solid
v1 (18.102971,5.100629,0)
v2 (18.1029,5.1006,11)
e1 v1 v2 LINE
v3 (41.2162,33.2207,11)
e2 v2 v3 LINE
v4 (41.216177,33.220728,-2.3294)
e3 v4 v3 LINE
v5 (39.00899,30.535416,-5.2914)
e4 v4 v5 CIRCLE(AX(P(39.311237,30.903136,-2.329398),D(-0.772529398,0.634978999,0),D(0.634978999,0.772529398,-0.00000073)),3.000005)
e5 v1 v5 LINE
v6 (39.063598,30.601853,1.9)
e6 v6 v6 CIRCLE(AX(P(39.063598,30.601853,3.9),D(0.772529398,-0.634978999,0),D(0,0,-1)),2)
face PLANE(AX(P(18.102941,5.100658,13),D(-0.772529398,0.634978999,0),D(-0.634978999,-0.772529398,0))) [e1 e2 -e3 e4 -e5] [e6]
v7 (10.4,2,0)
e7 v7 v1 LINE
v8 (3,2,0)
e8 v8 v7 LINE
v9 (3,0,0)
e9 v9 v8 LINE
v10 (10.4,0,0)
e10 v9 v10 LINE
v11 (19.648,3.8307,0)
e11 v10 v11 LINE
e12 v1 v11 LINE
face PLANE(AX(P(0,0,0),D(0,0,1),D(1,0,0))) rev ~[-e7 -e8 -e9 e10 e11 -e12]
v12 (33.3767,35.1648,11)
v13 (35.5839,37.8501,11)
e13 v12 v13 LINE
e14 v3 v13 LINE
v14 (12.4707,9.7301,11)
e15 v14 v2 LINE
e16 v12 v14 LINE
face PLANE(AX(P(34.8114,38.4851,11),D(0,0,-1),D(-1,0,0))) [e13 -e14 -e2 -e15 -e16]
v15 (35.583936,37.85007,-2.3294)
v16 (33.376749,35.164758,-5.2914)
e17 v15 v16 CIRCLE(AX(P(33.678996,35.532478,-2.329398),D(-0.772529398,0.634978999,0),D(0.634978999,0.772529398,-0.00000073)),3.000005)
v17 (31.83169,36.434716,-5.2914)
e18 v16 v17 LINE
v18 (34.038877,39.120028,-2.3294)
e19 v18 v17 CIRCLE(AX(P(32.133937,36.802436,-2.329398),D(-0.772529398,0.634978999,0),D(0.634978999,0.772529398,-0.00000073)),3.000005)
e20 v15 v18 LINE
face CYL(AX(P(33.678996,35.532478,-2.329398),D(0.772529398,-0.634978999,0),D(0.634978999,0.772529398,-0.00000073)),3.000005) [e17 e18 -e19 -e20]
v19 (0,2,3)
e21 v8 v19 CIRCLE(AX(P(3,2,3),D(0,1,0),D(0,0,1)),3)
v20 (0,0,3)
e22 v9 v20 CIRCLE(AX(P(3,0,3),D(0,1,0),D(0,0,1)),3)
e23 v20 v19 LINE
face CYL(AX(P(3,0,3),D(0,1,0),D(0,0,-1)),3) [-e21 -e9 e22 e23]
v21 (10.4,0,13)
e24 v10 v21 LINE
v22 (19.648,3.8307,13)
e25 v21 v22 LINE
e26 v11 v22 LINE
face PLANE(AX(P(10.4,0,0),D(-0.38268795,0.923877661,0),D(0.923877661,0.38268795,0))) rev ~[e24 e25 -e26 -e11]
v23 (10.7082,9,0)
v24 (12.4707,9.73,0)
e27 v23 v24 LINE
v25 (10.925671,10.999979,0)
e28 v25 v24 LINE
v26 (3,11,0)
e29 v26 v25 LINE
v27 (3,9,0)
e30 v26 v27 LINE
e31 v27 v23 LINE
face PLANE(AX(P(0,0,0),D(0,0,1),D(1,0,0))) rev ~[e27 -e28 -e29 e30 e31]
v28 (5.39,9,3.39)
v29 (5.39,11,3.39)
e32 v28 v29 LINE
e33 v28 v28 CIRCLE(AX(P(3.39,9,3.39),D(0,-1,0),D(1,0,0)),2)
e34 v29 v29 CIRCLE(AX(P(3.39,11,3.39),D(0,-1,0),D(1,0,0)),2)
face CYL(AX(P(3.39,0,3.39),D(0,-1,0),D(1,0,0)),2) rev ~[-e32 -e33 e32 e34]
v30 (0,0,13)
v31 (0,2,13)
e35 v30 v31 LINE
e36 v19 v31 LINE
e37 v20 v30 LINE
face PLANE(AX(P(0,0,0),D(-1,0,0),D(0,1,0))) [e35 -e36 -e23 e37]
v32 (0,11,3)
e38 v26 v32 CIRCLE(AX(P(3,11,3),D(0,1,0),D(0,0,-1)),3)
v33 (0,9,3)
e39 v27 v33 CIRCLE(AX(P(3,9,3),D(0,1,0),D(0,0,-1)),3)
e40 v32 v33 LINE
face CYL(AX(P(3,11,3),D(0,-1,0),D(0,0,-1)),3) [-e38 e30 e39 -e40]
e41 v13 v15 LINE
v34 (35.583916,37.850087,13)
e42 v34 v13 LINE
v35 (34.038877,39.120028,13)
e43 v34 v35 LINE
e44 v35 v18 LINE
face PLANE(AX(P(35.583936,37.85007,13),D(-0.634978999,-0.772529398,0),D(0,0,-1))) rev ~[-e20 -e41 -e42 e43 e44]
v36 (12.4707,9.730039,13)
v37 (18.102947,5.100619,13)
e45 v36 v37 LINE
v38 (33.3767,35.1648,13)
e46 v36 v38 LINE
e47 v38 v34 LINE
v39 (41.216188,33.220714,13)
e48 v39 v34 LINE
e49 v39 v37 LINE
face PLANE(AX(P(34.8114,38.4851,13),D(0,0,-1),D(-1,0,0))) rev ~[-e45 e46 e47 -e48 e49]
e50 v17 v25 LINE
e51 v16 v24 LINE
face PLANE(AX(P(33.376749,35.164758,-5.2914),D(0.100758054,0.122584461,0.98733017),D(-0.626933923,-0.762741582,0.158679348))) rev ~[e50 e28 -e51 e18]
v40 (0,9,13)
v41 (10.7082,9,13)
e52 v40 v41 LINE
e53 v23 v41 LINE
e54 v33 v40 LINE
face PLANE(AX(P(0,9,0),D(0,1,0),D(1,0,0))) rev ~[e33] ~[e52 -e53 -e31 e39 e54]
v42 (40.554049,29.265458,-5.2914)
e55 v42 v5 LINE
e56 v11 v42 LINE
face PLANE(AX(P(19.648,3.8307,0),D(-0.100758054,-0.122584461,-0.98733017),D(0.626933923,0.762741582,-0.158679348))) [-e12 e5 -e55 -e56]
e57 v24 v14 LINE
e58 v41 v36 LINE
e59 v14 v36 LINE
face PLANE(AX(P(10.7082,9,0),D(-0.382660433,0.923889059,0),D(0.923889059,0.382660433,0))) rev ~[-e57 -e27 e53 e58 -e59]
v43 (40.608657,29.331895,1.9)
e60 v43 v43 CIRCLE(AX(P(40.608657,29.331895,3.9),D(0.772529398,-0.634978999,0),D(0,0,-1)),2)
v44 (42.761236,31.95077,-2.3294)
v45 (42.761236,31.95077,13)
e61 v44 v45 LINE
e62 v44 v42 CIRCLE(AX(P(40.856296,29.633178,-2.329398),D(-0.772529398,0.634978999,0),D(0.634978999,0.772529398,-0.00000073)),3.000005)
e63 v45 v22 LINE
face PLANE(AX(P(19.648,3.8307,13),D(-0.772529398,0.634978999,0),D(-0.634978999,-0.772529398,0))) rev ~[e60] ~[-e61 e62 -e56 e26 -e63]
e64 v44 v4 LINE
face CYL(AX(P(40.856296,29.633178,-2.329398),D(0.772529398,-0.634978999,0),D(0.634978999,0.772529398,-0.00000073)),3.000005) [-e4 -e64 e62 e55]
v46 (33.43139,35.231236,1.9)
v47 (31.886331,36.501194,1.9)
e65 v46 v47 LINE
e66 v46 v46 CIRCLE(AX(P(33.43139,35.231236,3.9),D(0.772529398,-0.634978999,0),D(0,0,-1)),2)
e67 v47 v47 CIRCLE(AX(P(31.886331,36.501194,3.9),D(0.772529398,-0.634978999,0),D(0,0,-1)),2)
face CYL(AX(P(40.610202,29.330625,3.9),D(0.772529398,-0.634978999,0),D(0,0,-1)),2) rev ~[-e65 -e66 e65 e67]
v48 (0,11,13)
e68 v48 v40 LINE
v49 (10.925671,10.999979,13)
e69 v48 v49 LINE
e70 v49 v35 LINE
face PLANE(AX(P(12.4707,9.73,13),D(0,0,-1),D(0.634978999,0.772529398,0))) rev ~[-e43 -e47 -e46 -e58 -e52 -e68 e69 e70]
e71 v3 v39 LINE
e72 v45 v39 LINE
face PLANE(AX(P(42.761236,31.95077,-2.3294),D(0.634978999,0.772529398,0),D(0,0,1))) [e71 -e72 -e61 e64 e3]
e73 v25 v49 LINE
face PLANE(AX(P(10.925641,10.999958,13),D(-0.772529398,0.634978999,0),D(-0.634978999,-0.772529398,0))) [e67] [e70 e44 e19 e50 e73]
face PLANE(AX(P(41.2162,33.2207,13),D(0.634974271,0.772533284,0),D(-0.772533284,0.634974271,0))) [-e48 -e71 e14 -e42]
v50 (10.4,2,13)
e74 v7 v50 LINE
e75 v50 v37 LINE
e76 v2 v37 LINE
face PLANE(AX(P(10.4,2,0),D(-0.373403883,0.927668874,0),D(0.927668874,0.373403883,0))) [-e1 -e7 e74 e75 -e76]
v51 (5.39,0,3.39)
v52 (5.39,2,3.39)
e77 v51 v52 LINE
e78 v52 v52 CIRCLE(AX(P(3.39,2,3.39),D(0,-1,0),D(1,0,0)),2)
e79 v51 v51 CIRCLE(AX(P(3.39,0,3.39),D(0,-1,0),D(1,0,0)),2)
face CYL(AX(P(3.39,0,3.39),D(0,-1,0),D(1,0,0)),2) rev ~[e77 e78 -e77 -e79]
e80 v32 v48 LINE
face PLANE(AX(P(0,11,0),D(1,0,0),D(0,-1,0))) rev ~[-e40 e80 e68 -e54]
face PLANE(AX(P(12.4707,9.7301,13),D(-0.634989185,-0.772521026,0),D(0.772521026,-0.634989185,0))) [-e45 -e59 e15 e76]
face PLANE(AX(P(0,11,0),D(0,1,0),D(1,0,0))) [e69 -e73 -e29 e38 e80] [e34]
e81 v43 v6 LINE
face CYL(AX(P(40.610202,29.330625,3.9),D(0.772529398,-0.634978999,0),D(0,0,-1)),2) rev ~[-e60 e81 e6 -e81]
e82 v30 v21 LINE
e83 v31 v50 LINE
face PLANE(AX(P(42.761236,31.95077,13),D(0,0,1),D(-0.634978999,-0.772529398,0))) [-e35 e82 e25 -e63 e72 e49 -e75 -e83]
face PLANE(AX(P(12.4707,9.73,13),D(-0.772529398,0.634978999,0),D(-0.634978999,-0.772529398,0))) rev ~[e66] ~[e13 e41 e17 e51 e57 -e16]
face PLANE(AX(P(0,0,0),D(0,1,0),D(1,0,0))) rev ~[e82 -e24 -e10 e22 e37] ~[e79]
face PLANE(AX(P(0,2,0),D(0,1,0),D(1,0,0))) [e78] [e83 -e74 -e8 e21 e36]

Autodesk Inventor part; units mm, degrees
ref_plane "YZ Plane" through (0, 0, 0) normal (1, 0, 0) x (0, 1, 0)
ref_plane "XZ Plane" through (0, 0, 0) normal (0, 1, 0) x (-1, 0, 0)
ref_plane "XY Plane" through (0, 0, 0) normal (0, 0, 1) x (1, 0, 0)
sketch "Esquisse1" plane through (0, 0, 0) normal (0, 0, 1) x (1, 0, 0)
  line L0 (0, 0) -> (0, 2)
  line L1 (0, 2) -> (10.4, 2)
  line L2 (0, 0) -> (10.4, 0)
  line L3 (10.4, 0) -> (19.648, 3.8307)
  line L4 (0, 9) -> (10.7082, 9)
  line L5 (0, 11) -> (0, 9)
  line L6 (0, 11) -> (10.9257, 11)
  line L7 (10.4, 2) -> (18.103, 5.1006)
  line L8 (18.103, 5.1006) -> (19.648, 3.8307)
  line L9 (10.9257, 11) -> (19.648, 3.8307) construction
  line L10 (10.9257, 11) -> (12.2416, 9.9184) construction
  line L11 (10.9257, 11) -> (12.4707, 9.73)
  line L12 (10.7082, 9) -> (12.4707, 9.73)
  dimension "d0" = 2
  dimension "d1" = 10.4
  dimension "d2" = 10.4
  dimension "d3" = 157.5
  dimension "d5" = 10.01
  dimension "d8" = 7
  dimension "d26" = 2
  dimension "d32" = 2
  dimension "d33" = 2
  dimension "d34" = 157.5
extrude "Extrusion1" add sketch "Esquisse1" along normal blind 13
sketch "Esquisse4" plane through (0, 0, 0) normal (0, -1, 0) x (1, 0, 0)
  circle A0 centre (3.39, 3.39) radius 2
  line L0 (0, 13) -> (10.4, 13) projected
  line L1 (0, 0) -> (0, 13) projected
  line L2 (10.4, 0) -> (0, 0) projected
  point P0 (3, 13)
  point P1 (0, 10)
  dimension "d35" = 4
  dimension "d37" = 3.39
  dimension "d50" = 3.39
extrude "Extrusion3" cut sketch "Esquisse4" against normal blind 13
ref_plane "Plan de construction3" through (19.648, 3.8307, 13) normal (-0.7725294, 0.634979, 0) x (-0.634979, -0.7725294, 0)
sketch "Esquisse5" plane through (19.648, 3.8307, 13) normal (-0.7725294, 0.634979, 0) x (-0.634979, -0.7725294, 0)
  line L0 (0, 0) -> (6.9376, 0) projected
  line L1 (0, -13) -> (6.9376, -13) projected
  line L2 (0, 0) -> (0, -13)
  line L3 (0, -13) -> (-32.924, -18.2914)
  line L4 (-36.4, -15.3294) -> (-36.4, 0)
  line L5 (-36.4, 0) -> (0, 0)
  arc A0 (-36.4, -15.3294) -> (-32.924, -18.2914) centre (-33.4, -15.3294) ccw
  point P0 (15.4354, -13)
  point P1 (5.0326, 0)
  point P2 (-36.4, -18.85)
  dimension "d40" = 36.4
  dimension "d41" = 18.85
  dimension "d42" = 3
extrude "Extrusion4" add sketch "Esquisse5" along normal blind 2
ref_plane "Plan de construction4" through (12.4707, 9.73, 13) normal (-0.7725294, 0.634979, 0) x (-0.634979, -0.7725294, 0)
sketch "Esquisse6" plane through (12.4707, 9.73, 13) normal (-0.7725294, 0.634979, 0) x (-0.634979, -0.7725294, 0)
  line L0 (0, -13) -> (0, 0) projected
  line L1 (0, -13) -> (0, 0) projected
  line L2 (0, -13) -> (0, 0)
  line L3 (0, 0) -> (-36.4, 0)
  line L4 (-36.4, 0) -> (-36.4, -15.3294) projected
  line L5 (-36.4, 0) -> (-36.4, -15.3294)
  line L6 (-32.924, -18.2914) -> (0, -13)
  arc A0 (-36.4, -15.3294) -> (-32.924, -18.2914) centre (-33.4, -15.3294) ccw
  point P0 (15.4354, -13)
  point P1 (-36.4, -18.85)
  dimension "d45" = 36.4
  dimension "d46" = 18.85
  dimension "d47" = 3
extrude "Extrusion5" add sketch "Esquisse6" along normal blind 2
fillet "Congé4" radius 3 2 edges at (0, 1, 0) (0, 10, 0)
ref_plane "Plan de construction6" through (34.8114, 38.4851, 13) normal (0, 0, -1) x (-1, 0, 0)
sketch "Esquisse8" plane through (34.8114, 38.4851, 13) normal (0, 0, -1) x (-1, 0, 0)
  line L0 (1.4347, -3.3203) -> (-0.7725, -0.635) projected
  line L1 (24.1032, -29.4851) -> (22.3407, -28.755) projected
  line L2 (-0.7725, -0.635) -> (22.3407, -28.755)
  line L3 (16.7085, -33.3845) -> (-6.4048, -5.2644) projected
  line L4 (22.3407, -28.755) -> (16.7085, -33.3845)
  line L5 (16.7085, -33.3845) -> (-6.4048, -5.2644)
  line L6 (-6.4048, -5.2644) -> (-0.7725, -0.635)
  point P0 (34.8114, -38.4851)
extrude "Extrusion6" add sketch "Esquisse8" along normal blind 2
sketch "Esquisse9" plane through (19.648, 3.8307, 13) normal (0.7725294, -0.634979, 0) x (0, 0, -1)
  circle A0 centre (9.1, 33.01) radius 2
  line L0 (18.2914, 32.924) -> (13, 0) construction
  line L1 (17.0751, 25.3561) -> (18.85, 36.4) construction
  line L2 (18.85, 36.4) -> (0, 36.4) construction
  line L3 (0, 36.4) -> (0, 0) construction
  point P0 (13, -15.4354)
  dimension "d54" = 3.39
  dimension "d55" = 9.1
  dimension "d56" = 4
extrude "Extrusion7" cut sketch "Esquisse9" against normal blind 13
properties part number "Thumb1" material "Plastique ABS"
